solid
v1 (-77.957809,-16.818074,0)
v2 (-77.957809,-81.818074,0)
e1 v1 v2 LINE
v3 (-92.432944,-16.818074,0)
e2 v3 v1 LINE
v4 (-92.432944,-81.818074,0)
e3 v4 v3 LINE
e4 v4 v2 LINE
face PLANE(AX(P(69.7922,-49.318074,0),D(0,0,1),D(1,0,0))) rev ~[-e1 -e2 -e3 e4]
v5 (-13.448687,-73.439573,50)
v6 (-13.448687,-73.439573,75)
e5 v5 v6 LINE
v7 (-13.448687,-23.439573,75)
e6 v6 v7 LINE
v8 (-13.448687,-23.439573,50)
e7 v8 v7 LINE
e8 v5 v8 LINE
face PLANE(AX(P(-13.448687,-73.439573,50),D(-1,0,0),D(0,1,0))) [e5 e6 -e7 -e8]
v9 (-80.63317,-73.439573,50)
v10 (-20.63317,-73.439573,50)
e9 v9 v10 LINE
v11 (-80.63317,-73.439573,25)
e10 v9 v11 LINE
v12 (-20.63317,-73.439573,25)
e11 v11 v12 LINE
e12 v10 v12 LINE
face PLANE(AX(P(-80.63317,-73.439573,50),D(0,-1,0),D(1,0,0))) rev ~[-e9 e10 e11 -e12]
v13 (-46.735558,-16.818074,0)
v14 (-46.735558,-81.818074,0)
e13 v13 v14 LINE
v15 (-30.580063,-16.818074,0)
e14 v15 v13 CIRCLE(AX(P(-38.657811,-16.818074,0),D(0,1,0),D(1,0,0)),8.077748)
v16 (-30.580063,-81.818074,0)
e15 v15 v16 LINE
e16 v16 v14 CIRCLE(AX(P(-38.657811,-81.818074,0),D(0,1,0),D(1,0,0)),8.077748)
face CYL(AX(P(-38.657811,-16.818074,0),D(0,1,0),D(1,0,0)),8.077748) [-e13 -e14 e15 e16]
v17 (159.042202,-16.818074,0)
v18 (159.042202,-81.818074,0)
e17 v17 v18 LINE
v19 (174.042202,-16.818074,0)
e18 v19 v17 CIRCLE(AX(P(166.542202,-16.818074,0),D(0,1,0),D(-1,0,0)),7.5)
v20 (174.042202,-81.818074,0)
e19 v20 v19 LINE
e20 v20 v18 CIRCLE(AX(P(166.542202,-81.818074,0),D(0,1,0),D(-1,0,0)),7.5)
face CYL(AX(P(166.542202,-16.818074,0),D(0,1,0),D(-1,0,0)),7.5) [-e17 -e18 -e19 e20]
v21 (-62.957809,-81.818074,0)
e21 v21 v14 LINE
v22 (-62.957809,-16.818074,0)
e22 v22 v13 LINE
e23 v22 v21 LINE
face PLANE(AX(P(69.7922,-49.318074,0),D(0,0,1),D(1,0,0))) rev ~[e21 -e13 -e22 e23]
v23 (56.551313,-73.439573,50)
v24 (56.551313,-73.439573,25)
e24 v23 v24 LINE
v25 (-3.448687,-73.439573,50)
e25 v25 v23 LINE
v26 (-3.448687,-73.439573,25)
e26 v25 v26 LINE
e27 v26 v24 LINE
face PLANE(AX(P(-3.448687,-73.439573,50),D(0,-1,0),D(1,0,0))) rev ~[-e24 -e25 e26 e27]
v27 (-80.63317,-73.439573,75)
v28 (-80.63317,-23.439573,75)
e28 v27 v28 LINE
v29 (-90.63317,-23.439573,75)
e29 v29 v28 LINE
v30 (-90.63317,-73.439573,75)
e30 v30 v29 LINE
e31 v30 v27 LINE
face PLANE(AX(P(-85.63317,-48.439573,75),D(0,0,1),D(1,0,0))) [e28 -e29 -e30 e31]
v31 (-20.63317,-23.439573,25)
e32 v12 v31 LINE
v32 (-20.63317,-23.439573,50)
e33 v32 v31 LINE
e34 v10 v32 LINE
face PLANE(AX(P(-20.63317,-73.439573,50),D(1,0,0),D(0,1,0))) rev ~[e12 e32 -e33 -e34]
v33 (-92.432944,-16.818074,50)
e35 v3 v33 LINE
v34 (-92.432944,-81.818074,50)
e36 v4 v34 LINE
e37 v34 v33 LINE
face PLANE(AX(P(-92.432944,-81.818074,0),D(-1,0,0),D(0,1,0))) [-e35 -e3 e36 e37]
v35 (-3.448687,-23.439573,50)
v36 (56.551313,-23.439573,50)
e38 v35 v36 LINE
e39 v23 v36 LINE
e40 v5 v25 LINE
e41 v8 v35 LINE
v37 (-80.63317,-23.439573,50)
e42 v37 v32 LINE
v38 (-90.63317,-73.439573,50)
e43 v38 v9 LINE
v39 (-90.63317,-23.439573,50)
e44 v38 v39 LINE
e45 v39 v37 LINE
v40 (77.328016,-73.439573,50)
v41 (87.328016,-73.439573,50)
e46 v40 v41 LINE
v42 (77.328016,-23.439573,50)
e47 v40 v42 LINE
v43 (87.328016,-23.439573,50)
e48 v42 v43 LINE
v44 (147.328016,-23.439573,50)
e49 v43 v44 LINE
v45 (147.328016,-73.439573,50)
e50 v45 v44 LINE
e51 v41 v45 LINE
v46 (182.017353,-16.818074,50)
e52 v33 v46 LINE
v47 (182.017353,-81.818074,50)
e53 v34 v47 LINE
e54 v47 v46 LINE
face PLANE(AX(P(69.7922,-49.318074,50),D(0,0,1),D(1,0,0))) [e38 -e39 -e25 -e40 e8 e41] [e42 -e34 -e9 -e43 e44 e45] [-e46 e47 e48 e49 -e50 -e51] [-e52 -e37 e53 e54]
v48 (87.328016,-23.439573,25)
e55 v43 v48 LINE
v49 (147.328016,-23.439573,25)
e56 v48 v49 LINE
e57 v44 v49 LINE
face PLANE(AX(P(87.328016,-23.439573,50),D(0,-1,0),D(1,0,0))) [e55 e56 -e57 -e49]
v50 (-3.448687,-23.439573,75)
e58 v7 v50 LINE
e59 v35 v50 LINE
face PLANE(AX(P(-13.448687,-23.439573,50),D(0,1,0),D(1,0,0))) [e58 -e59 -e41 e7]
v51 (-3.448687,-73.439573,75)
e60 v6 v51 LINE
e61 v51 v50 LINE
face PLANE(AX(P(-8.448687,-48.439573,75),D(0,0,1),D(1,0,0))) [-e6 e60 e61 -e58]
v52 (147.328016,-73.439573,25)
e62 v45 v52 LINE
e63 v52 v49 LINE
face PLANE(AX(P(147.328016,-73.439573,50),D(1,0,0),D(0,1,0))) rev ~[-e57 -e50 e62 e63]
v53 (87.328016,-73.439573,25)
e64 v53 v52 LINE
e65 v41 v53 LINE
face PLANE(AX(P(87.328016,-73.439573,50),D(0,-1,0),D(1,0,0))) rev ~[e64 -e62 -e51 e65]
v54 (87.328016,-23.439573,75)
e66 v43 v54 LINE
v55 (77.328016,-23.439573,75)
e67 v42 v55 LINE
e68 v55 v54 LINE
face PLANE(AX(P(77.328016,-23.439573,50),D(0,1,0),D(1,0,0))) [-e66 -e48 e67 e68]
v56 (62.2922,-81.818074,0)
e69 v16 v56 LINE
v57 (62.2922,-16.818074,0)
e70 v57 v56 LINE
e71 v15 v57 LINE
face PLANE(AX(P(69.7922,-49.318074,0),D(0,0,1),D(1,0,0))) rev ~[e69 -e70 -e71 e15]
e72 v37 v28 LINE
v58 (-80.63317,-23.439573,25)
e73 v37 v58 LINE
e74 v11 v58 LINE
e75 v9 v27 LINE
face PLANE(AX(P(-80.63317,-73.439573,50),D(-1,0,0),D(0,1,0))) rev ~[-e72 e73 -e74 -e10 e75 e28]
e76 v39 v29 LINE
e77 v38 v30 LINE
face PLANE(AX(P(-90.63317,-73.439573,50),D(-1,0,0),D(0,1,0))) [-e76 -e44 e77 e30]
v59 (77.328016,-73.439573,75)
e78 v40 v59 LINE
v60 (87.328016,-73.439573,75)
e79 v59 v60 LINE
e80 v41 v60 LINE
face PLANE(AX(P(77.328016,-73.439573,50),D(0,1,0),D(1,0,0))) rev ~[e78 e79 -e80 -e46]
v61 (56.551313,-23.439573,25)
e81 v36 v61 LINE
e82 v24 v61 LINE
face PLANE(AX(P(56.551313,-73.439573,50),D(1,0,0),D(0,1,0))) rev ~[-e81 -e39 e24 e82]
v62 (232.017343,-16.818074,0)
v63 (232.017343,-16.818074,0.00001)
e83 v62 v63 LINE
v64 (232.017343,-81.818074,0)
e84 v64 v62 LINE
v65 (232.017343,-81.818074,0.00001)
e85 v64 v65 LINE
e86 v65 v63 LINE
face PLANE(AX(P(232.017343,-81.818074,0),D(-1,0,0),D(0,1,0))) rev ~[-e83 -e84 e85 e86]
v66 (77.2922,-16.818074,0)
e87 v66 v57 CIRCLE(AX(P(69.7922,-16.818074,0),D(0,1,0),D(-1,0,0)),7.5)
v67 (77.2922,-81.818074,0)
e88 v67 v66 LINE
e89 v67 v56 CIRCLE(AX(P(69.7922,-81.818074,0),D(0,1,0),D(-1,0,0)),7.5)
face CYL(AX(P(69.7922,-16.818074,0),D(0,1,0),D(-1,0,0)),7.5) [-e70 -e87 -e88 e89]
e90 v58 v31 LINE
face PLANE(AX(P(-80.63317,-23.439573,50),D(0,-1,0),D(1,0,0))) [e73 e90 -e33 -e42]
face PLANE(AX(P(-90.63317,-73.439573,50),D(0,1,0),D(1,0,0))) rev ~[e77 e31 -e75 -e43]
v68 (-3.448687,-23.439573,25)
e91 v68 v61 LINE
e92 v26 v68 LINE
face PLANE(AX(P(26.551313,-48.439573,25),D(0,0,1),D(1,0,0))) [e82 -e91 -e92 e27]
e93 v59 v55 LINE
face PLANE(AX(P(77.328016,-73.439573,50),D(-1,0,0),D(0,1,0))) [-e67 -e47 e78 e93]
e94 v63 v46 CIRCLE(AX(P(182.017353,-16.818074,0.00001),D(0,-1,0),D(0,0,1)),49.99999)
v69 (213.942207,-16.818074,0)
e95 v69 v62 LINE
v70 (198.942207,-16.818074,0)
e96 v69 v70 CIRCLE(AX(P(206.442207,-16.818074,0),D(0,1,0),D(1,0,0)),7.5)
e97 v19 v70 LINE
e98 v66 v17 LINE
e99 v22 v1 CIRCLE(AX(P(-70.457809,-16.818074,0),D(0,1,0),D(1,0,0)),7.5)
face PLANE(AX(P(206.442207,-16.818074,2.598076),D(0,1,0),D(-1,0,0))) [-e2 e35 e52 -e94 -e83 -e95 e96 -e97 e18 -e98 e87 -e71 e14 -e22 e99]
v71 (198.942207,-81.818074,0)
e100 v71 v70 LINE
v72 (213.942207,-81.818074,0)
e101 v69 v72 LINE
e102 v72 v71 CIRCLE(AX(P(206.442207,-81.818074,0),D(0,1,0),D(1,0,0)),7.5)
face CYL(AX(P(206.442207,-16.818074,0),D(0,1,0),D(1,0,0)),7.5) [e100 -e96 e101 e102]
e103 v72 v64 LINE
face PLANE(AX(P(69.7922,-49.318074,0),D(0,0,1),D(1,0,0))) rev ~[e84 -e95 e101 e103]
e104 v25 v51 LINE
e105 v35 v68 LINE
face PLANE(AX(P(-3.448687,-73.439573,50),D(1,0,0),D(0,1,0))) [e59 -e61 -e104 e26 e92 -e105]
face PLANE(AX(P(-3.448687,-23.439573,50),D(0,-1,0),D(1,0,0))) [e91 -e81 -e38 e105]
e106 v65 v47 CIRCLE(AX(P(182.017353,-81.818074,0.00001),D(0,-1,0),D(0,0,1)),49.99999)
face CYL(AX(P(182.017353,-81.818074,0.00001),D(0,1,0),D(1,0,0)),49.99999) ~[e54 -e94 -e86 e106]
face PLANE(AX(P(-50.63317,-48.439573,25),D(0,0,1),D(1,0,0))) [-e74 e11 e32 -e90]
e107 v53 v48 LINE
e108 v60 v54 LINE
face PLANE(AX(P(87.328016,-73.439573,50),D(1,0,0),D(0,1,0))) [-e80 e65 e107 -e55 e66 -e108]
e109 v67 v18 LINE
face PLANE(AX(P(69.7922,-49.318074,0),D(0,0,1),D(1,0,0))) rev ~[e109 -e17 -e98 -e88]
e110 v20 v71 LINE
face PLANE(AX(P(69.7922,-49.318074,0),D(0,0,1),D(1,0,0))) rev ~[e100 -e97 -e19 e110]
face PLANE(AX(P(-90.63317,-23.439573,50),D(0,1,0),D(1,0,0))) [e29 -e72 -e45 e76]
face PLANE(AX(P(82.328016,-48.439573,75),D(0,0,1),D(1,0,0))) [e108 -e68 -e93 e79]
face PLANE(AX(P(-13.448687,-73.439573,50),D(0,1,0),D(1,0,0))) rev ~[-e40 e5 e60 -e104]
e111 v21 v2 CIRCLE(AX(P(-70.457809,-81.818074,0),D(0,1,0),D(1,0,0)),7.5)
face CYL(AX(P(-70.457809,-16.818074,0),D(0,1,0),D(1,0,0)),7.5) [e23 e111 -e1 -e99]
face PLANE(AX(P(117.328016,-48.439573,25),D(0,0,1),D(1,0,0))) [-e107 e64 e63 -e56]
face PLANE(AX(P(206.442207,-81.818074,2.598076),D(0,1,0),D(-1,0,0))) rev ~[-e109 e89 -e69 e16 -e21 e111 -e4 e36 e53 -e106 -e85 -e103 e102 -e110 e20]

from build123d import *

# Parameters (mm, degrees)
F0_W      = 324.4502871967
F0_H      = 65
F1_DEPTH  = 50
F2_R      = 49.99999
F3_W      = 60
F3_H      = 50
F4_DEPTH  = 25
F6_DEPTH  = 65
F8_DEPTH  = 65
F9_W      = 10
F9_H      = 50
F10_DEPTH = 25


# Not quite as in the source:
# - a fillet or chamfer is up to 0.001 mm smaller than in the source, because OpenCascade refuses the exact size


with BuildPart() as f1:
    # F0 (on Top) → F1 (new body)
    with BuildSketch(Plane.XY):
        with Locations((69.7921998799, -49.3180742487)):
            Rectangle(F0_W, F0_H)
    extrude(amount=F1_DEPTH)

    # F2 (radius 50 in the source; OpenCascade refuses exactly that, so slightly less here)
    f2_edges = [f1.edges().sort_by_distance(p)[0] for p in [
        (232.017343, -49.318074, 50),
    ]]
    fillet(f2_edges, radius=F2_R)

    # F3 (on face) → F4 (cut)
    with BuildSketch(Plane.XY.offset(50)):
        with Locations((-50.6331702159, -48.4395725653)):
            Rectangle(F3_W, F3_H)
        with Locations((26.5513133067, -48.4395725653)):
            Rectangle(F3_W, F3_H)
        with Locations((117.3280163615, -48.4395725653)):
            Rectangle(F3_W, F3_H)
    extrude(amount=-F4_DEPTH, mode=Mode.SUBTRACT)

    # F5 (on face) → F6 (cut)
    with BuildSketch(Plane.XZ.offset(81.8180742487)):
        with BuildLine():
            ThreePointArc((211.8422013521, 0), (204.3422013521, 7.5), (196.8422013521, 0))
            Line((196.8422013521, 0), (211.8422013521, 0))
        make_face()
        with BuildLine():
            ThreePointArc((165.3422039747, 0), (157.8422039747, 7.5), (150.3422039747, 0))
            Line((150.3422039747, 0), (165.3422039747, 0))
        make_face()
        with BuildLine():
            ThreePointArc((-22.1578053385, 0), (-29.6578053385, 7.5), (-37.1578053385, 0))
            Line((-37.1578053385, 0), (-22.1578053385, 0))
        make_face()
        with BuildLine():
            Line((-85.1578038931, 0), (-70.1578038931, 0))
            ThreePointArc((-70.1578038931, 0), (-77.6578038931, 7.5), (-85.1578038931, 0))
        make_face()
    extrude(amount=F6_DEPTH, mode=Mode.SUBTRACT)

    # F7 (on face) → F8 (join)
    with BuildSketch(Plane(origin=(0, -16.8180742487, 0), x_dir=(-1, 0, 0), z_dir=(0, 1, 0))):
        with BuildLine():
            Line((-213.942207098, 0), (-198.942207098, 0))
            ThreePointArc((-198.942207098, 0), (-206.442207098, 7.5), (-213.942207098, 0))
        make_face()
        with BuildLine():
            ThreePointArc((-213.942207098, 0), (-206.442207098, -7.5), (-198.942207098, 0))
            Line((-198.942207098, 0), (-213.942207098, 0))
        make_face()
        with BuildLine():
            Line((-159.0422022343, 0), (-174.0422022343, 0))
            ThreePointArc((-174.0422022343, 0), (-166.5422022343, -7.5), (-159.0422022343, 0))
        make_face()
        with BuildLine():
            ThreePointArc((-159.0422022343, 0), (-166.5422022343, 7.5), (-174.0422022343, 0))
            Line((-174.0422022343, 0), (-159.0422022343, 0))
        make_face()
        with BuildLine():
            Line((-62.2921998799, 0), (-77.2921998799, 0))
            ThreePointArc((-77.2921998799, 0), (-69.7921998799, -7.5), (-62.2921998799, 0))
        make_face()
        with BuildLine():
            ThreePointArc((-62.2921998799, 0), (-69.7921998799, 7.5), (-77.2921998799, 0))
            Line((-77.2921998799, 0), (-62.2921998799, 0))
        make_face()
        with BuildLine():
            Line((46.7355581226, 0), (30.5800629554, 0))
            ThreePointArc((30.5800629554, 0), (38.657810539, -8.0777475836), (46.7355581226, 0))
        make_face()
        with BuildLine():
            ThreePointArc((62.9578086734, 0), (70.4578086734, -7.5), (77.9578086734, 0))
            Line((77.9578086734, 0), (62.9578086734, 0))
        make_face()
    extrude(amount=-F8_DEPTH)

    # F9 (on face) → F10 (join)
    with BuildSketch(Plane.XY.offset(50)):
        with Locations((-85.6331702159, -48.4395725653)):
            Rectangle(F9_W, F9_H)
        with Locations((-8.4486866933, -48.4395725653)):
            Rectangle(F9_W, F9_H)
        with Locations((82.3280163615, -48.4395725653)):
            Rectangle(F9_W, F9_H)
    extrude(amount=F10_DEPTH)


solid = f1.part
